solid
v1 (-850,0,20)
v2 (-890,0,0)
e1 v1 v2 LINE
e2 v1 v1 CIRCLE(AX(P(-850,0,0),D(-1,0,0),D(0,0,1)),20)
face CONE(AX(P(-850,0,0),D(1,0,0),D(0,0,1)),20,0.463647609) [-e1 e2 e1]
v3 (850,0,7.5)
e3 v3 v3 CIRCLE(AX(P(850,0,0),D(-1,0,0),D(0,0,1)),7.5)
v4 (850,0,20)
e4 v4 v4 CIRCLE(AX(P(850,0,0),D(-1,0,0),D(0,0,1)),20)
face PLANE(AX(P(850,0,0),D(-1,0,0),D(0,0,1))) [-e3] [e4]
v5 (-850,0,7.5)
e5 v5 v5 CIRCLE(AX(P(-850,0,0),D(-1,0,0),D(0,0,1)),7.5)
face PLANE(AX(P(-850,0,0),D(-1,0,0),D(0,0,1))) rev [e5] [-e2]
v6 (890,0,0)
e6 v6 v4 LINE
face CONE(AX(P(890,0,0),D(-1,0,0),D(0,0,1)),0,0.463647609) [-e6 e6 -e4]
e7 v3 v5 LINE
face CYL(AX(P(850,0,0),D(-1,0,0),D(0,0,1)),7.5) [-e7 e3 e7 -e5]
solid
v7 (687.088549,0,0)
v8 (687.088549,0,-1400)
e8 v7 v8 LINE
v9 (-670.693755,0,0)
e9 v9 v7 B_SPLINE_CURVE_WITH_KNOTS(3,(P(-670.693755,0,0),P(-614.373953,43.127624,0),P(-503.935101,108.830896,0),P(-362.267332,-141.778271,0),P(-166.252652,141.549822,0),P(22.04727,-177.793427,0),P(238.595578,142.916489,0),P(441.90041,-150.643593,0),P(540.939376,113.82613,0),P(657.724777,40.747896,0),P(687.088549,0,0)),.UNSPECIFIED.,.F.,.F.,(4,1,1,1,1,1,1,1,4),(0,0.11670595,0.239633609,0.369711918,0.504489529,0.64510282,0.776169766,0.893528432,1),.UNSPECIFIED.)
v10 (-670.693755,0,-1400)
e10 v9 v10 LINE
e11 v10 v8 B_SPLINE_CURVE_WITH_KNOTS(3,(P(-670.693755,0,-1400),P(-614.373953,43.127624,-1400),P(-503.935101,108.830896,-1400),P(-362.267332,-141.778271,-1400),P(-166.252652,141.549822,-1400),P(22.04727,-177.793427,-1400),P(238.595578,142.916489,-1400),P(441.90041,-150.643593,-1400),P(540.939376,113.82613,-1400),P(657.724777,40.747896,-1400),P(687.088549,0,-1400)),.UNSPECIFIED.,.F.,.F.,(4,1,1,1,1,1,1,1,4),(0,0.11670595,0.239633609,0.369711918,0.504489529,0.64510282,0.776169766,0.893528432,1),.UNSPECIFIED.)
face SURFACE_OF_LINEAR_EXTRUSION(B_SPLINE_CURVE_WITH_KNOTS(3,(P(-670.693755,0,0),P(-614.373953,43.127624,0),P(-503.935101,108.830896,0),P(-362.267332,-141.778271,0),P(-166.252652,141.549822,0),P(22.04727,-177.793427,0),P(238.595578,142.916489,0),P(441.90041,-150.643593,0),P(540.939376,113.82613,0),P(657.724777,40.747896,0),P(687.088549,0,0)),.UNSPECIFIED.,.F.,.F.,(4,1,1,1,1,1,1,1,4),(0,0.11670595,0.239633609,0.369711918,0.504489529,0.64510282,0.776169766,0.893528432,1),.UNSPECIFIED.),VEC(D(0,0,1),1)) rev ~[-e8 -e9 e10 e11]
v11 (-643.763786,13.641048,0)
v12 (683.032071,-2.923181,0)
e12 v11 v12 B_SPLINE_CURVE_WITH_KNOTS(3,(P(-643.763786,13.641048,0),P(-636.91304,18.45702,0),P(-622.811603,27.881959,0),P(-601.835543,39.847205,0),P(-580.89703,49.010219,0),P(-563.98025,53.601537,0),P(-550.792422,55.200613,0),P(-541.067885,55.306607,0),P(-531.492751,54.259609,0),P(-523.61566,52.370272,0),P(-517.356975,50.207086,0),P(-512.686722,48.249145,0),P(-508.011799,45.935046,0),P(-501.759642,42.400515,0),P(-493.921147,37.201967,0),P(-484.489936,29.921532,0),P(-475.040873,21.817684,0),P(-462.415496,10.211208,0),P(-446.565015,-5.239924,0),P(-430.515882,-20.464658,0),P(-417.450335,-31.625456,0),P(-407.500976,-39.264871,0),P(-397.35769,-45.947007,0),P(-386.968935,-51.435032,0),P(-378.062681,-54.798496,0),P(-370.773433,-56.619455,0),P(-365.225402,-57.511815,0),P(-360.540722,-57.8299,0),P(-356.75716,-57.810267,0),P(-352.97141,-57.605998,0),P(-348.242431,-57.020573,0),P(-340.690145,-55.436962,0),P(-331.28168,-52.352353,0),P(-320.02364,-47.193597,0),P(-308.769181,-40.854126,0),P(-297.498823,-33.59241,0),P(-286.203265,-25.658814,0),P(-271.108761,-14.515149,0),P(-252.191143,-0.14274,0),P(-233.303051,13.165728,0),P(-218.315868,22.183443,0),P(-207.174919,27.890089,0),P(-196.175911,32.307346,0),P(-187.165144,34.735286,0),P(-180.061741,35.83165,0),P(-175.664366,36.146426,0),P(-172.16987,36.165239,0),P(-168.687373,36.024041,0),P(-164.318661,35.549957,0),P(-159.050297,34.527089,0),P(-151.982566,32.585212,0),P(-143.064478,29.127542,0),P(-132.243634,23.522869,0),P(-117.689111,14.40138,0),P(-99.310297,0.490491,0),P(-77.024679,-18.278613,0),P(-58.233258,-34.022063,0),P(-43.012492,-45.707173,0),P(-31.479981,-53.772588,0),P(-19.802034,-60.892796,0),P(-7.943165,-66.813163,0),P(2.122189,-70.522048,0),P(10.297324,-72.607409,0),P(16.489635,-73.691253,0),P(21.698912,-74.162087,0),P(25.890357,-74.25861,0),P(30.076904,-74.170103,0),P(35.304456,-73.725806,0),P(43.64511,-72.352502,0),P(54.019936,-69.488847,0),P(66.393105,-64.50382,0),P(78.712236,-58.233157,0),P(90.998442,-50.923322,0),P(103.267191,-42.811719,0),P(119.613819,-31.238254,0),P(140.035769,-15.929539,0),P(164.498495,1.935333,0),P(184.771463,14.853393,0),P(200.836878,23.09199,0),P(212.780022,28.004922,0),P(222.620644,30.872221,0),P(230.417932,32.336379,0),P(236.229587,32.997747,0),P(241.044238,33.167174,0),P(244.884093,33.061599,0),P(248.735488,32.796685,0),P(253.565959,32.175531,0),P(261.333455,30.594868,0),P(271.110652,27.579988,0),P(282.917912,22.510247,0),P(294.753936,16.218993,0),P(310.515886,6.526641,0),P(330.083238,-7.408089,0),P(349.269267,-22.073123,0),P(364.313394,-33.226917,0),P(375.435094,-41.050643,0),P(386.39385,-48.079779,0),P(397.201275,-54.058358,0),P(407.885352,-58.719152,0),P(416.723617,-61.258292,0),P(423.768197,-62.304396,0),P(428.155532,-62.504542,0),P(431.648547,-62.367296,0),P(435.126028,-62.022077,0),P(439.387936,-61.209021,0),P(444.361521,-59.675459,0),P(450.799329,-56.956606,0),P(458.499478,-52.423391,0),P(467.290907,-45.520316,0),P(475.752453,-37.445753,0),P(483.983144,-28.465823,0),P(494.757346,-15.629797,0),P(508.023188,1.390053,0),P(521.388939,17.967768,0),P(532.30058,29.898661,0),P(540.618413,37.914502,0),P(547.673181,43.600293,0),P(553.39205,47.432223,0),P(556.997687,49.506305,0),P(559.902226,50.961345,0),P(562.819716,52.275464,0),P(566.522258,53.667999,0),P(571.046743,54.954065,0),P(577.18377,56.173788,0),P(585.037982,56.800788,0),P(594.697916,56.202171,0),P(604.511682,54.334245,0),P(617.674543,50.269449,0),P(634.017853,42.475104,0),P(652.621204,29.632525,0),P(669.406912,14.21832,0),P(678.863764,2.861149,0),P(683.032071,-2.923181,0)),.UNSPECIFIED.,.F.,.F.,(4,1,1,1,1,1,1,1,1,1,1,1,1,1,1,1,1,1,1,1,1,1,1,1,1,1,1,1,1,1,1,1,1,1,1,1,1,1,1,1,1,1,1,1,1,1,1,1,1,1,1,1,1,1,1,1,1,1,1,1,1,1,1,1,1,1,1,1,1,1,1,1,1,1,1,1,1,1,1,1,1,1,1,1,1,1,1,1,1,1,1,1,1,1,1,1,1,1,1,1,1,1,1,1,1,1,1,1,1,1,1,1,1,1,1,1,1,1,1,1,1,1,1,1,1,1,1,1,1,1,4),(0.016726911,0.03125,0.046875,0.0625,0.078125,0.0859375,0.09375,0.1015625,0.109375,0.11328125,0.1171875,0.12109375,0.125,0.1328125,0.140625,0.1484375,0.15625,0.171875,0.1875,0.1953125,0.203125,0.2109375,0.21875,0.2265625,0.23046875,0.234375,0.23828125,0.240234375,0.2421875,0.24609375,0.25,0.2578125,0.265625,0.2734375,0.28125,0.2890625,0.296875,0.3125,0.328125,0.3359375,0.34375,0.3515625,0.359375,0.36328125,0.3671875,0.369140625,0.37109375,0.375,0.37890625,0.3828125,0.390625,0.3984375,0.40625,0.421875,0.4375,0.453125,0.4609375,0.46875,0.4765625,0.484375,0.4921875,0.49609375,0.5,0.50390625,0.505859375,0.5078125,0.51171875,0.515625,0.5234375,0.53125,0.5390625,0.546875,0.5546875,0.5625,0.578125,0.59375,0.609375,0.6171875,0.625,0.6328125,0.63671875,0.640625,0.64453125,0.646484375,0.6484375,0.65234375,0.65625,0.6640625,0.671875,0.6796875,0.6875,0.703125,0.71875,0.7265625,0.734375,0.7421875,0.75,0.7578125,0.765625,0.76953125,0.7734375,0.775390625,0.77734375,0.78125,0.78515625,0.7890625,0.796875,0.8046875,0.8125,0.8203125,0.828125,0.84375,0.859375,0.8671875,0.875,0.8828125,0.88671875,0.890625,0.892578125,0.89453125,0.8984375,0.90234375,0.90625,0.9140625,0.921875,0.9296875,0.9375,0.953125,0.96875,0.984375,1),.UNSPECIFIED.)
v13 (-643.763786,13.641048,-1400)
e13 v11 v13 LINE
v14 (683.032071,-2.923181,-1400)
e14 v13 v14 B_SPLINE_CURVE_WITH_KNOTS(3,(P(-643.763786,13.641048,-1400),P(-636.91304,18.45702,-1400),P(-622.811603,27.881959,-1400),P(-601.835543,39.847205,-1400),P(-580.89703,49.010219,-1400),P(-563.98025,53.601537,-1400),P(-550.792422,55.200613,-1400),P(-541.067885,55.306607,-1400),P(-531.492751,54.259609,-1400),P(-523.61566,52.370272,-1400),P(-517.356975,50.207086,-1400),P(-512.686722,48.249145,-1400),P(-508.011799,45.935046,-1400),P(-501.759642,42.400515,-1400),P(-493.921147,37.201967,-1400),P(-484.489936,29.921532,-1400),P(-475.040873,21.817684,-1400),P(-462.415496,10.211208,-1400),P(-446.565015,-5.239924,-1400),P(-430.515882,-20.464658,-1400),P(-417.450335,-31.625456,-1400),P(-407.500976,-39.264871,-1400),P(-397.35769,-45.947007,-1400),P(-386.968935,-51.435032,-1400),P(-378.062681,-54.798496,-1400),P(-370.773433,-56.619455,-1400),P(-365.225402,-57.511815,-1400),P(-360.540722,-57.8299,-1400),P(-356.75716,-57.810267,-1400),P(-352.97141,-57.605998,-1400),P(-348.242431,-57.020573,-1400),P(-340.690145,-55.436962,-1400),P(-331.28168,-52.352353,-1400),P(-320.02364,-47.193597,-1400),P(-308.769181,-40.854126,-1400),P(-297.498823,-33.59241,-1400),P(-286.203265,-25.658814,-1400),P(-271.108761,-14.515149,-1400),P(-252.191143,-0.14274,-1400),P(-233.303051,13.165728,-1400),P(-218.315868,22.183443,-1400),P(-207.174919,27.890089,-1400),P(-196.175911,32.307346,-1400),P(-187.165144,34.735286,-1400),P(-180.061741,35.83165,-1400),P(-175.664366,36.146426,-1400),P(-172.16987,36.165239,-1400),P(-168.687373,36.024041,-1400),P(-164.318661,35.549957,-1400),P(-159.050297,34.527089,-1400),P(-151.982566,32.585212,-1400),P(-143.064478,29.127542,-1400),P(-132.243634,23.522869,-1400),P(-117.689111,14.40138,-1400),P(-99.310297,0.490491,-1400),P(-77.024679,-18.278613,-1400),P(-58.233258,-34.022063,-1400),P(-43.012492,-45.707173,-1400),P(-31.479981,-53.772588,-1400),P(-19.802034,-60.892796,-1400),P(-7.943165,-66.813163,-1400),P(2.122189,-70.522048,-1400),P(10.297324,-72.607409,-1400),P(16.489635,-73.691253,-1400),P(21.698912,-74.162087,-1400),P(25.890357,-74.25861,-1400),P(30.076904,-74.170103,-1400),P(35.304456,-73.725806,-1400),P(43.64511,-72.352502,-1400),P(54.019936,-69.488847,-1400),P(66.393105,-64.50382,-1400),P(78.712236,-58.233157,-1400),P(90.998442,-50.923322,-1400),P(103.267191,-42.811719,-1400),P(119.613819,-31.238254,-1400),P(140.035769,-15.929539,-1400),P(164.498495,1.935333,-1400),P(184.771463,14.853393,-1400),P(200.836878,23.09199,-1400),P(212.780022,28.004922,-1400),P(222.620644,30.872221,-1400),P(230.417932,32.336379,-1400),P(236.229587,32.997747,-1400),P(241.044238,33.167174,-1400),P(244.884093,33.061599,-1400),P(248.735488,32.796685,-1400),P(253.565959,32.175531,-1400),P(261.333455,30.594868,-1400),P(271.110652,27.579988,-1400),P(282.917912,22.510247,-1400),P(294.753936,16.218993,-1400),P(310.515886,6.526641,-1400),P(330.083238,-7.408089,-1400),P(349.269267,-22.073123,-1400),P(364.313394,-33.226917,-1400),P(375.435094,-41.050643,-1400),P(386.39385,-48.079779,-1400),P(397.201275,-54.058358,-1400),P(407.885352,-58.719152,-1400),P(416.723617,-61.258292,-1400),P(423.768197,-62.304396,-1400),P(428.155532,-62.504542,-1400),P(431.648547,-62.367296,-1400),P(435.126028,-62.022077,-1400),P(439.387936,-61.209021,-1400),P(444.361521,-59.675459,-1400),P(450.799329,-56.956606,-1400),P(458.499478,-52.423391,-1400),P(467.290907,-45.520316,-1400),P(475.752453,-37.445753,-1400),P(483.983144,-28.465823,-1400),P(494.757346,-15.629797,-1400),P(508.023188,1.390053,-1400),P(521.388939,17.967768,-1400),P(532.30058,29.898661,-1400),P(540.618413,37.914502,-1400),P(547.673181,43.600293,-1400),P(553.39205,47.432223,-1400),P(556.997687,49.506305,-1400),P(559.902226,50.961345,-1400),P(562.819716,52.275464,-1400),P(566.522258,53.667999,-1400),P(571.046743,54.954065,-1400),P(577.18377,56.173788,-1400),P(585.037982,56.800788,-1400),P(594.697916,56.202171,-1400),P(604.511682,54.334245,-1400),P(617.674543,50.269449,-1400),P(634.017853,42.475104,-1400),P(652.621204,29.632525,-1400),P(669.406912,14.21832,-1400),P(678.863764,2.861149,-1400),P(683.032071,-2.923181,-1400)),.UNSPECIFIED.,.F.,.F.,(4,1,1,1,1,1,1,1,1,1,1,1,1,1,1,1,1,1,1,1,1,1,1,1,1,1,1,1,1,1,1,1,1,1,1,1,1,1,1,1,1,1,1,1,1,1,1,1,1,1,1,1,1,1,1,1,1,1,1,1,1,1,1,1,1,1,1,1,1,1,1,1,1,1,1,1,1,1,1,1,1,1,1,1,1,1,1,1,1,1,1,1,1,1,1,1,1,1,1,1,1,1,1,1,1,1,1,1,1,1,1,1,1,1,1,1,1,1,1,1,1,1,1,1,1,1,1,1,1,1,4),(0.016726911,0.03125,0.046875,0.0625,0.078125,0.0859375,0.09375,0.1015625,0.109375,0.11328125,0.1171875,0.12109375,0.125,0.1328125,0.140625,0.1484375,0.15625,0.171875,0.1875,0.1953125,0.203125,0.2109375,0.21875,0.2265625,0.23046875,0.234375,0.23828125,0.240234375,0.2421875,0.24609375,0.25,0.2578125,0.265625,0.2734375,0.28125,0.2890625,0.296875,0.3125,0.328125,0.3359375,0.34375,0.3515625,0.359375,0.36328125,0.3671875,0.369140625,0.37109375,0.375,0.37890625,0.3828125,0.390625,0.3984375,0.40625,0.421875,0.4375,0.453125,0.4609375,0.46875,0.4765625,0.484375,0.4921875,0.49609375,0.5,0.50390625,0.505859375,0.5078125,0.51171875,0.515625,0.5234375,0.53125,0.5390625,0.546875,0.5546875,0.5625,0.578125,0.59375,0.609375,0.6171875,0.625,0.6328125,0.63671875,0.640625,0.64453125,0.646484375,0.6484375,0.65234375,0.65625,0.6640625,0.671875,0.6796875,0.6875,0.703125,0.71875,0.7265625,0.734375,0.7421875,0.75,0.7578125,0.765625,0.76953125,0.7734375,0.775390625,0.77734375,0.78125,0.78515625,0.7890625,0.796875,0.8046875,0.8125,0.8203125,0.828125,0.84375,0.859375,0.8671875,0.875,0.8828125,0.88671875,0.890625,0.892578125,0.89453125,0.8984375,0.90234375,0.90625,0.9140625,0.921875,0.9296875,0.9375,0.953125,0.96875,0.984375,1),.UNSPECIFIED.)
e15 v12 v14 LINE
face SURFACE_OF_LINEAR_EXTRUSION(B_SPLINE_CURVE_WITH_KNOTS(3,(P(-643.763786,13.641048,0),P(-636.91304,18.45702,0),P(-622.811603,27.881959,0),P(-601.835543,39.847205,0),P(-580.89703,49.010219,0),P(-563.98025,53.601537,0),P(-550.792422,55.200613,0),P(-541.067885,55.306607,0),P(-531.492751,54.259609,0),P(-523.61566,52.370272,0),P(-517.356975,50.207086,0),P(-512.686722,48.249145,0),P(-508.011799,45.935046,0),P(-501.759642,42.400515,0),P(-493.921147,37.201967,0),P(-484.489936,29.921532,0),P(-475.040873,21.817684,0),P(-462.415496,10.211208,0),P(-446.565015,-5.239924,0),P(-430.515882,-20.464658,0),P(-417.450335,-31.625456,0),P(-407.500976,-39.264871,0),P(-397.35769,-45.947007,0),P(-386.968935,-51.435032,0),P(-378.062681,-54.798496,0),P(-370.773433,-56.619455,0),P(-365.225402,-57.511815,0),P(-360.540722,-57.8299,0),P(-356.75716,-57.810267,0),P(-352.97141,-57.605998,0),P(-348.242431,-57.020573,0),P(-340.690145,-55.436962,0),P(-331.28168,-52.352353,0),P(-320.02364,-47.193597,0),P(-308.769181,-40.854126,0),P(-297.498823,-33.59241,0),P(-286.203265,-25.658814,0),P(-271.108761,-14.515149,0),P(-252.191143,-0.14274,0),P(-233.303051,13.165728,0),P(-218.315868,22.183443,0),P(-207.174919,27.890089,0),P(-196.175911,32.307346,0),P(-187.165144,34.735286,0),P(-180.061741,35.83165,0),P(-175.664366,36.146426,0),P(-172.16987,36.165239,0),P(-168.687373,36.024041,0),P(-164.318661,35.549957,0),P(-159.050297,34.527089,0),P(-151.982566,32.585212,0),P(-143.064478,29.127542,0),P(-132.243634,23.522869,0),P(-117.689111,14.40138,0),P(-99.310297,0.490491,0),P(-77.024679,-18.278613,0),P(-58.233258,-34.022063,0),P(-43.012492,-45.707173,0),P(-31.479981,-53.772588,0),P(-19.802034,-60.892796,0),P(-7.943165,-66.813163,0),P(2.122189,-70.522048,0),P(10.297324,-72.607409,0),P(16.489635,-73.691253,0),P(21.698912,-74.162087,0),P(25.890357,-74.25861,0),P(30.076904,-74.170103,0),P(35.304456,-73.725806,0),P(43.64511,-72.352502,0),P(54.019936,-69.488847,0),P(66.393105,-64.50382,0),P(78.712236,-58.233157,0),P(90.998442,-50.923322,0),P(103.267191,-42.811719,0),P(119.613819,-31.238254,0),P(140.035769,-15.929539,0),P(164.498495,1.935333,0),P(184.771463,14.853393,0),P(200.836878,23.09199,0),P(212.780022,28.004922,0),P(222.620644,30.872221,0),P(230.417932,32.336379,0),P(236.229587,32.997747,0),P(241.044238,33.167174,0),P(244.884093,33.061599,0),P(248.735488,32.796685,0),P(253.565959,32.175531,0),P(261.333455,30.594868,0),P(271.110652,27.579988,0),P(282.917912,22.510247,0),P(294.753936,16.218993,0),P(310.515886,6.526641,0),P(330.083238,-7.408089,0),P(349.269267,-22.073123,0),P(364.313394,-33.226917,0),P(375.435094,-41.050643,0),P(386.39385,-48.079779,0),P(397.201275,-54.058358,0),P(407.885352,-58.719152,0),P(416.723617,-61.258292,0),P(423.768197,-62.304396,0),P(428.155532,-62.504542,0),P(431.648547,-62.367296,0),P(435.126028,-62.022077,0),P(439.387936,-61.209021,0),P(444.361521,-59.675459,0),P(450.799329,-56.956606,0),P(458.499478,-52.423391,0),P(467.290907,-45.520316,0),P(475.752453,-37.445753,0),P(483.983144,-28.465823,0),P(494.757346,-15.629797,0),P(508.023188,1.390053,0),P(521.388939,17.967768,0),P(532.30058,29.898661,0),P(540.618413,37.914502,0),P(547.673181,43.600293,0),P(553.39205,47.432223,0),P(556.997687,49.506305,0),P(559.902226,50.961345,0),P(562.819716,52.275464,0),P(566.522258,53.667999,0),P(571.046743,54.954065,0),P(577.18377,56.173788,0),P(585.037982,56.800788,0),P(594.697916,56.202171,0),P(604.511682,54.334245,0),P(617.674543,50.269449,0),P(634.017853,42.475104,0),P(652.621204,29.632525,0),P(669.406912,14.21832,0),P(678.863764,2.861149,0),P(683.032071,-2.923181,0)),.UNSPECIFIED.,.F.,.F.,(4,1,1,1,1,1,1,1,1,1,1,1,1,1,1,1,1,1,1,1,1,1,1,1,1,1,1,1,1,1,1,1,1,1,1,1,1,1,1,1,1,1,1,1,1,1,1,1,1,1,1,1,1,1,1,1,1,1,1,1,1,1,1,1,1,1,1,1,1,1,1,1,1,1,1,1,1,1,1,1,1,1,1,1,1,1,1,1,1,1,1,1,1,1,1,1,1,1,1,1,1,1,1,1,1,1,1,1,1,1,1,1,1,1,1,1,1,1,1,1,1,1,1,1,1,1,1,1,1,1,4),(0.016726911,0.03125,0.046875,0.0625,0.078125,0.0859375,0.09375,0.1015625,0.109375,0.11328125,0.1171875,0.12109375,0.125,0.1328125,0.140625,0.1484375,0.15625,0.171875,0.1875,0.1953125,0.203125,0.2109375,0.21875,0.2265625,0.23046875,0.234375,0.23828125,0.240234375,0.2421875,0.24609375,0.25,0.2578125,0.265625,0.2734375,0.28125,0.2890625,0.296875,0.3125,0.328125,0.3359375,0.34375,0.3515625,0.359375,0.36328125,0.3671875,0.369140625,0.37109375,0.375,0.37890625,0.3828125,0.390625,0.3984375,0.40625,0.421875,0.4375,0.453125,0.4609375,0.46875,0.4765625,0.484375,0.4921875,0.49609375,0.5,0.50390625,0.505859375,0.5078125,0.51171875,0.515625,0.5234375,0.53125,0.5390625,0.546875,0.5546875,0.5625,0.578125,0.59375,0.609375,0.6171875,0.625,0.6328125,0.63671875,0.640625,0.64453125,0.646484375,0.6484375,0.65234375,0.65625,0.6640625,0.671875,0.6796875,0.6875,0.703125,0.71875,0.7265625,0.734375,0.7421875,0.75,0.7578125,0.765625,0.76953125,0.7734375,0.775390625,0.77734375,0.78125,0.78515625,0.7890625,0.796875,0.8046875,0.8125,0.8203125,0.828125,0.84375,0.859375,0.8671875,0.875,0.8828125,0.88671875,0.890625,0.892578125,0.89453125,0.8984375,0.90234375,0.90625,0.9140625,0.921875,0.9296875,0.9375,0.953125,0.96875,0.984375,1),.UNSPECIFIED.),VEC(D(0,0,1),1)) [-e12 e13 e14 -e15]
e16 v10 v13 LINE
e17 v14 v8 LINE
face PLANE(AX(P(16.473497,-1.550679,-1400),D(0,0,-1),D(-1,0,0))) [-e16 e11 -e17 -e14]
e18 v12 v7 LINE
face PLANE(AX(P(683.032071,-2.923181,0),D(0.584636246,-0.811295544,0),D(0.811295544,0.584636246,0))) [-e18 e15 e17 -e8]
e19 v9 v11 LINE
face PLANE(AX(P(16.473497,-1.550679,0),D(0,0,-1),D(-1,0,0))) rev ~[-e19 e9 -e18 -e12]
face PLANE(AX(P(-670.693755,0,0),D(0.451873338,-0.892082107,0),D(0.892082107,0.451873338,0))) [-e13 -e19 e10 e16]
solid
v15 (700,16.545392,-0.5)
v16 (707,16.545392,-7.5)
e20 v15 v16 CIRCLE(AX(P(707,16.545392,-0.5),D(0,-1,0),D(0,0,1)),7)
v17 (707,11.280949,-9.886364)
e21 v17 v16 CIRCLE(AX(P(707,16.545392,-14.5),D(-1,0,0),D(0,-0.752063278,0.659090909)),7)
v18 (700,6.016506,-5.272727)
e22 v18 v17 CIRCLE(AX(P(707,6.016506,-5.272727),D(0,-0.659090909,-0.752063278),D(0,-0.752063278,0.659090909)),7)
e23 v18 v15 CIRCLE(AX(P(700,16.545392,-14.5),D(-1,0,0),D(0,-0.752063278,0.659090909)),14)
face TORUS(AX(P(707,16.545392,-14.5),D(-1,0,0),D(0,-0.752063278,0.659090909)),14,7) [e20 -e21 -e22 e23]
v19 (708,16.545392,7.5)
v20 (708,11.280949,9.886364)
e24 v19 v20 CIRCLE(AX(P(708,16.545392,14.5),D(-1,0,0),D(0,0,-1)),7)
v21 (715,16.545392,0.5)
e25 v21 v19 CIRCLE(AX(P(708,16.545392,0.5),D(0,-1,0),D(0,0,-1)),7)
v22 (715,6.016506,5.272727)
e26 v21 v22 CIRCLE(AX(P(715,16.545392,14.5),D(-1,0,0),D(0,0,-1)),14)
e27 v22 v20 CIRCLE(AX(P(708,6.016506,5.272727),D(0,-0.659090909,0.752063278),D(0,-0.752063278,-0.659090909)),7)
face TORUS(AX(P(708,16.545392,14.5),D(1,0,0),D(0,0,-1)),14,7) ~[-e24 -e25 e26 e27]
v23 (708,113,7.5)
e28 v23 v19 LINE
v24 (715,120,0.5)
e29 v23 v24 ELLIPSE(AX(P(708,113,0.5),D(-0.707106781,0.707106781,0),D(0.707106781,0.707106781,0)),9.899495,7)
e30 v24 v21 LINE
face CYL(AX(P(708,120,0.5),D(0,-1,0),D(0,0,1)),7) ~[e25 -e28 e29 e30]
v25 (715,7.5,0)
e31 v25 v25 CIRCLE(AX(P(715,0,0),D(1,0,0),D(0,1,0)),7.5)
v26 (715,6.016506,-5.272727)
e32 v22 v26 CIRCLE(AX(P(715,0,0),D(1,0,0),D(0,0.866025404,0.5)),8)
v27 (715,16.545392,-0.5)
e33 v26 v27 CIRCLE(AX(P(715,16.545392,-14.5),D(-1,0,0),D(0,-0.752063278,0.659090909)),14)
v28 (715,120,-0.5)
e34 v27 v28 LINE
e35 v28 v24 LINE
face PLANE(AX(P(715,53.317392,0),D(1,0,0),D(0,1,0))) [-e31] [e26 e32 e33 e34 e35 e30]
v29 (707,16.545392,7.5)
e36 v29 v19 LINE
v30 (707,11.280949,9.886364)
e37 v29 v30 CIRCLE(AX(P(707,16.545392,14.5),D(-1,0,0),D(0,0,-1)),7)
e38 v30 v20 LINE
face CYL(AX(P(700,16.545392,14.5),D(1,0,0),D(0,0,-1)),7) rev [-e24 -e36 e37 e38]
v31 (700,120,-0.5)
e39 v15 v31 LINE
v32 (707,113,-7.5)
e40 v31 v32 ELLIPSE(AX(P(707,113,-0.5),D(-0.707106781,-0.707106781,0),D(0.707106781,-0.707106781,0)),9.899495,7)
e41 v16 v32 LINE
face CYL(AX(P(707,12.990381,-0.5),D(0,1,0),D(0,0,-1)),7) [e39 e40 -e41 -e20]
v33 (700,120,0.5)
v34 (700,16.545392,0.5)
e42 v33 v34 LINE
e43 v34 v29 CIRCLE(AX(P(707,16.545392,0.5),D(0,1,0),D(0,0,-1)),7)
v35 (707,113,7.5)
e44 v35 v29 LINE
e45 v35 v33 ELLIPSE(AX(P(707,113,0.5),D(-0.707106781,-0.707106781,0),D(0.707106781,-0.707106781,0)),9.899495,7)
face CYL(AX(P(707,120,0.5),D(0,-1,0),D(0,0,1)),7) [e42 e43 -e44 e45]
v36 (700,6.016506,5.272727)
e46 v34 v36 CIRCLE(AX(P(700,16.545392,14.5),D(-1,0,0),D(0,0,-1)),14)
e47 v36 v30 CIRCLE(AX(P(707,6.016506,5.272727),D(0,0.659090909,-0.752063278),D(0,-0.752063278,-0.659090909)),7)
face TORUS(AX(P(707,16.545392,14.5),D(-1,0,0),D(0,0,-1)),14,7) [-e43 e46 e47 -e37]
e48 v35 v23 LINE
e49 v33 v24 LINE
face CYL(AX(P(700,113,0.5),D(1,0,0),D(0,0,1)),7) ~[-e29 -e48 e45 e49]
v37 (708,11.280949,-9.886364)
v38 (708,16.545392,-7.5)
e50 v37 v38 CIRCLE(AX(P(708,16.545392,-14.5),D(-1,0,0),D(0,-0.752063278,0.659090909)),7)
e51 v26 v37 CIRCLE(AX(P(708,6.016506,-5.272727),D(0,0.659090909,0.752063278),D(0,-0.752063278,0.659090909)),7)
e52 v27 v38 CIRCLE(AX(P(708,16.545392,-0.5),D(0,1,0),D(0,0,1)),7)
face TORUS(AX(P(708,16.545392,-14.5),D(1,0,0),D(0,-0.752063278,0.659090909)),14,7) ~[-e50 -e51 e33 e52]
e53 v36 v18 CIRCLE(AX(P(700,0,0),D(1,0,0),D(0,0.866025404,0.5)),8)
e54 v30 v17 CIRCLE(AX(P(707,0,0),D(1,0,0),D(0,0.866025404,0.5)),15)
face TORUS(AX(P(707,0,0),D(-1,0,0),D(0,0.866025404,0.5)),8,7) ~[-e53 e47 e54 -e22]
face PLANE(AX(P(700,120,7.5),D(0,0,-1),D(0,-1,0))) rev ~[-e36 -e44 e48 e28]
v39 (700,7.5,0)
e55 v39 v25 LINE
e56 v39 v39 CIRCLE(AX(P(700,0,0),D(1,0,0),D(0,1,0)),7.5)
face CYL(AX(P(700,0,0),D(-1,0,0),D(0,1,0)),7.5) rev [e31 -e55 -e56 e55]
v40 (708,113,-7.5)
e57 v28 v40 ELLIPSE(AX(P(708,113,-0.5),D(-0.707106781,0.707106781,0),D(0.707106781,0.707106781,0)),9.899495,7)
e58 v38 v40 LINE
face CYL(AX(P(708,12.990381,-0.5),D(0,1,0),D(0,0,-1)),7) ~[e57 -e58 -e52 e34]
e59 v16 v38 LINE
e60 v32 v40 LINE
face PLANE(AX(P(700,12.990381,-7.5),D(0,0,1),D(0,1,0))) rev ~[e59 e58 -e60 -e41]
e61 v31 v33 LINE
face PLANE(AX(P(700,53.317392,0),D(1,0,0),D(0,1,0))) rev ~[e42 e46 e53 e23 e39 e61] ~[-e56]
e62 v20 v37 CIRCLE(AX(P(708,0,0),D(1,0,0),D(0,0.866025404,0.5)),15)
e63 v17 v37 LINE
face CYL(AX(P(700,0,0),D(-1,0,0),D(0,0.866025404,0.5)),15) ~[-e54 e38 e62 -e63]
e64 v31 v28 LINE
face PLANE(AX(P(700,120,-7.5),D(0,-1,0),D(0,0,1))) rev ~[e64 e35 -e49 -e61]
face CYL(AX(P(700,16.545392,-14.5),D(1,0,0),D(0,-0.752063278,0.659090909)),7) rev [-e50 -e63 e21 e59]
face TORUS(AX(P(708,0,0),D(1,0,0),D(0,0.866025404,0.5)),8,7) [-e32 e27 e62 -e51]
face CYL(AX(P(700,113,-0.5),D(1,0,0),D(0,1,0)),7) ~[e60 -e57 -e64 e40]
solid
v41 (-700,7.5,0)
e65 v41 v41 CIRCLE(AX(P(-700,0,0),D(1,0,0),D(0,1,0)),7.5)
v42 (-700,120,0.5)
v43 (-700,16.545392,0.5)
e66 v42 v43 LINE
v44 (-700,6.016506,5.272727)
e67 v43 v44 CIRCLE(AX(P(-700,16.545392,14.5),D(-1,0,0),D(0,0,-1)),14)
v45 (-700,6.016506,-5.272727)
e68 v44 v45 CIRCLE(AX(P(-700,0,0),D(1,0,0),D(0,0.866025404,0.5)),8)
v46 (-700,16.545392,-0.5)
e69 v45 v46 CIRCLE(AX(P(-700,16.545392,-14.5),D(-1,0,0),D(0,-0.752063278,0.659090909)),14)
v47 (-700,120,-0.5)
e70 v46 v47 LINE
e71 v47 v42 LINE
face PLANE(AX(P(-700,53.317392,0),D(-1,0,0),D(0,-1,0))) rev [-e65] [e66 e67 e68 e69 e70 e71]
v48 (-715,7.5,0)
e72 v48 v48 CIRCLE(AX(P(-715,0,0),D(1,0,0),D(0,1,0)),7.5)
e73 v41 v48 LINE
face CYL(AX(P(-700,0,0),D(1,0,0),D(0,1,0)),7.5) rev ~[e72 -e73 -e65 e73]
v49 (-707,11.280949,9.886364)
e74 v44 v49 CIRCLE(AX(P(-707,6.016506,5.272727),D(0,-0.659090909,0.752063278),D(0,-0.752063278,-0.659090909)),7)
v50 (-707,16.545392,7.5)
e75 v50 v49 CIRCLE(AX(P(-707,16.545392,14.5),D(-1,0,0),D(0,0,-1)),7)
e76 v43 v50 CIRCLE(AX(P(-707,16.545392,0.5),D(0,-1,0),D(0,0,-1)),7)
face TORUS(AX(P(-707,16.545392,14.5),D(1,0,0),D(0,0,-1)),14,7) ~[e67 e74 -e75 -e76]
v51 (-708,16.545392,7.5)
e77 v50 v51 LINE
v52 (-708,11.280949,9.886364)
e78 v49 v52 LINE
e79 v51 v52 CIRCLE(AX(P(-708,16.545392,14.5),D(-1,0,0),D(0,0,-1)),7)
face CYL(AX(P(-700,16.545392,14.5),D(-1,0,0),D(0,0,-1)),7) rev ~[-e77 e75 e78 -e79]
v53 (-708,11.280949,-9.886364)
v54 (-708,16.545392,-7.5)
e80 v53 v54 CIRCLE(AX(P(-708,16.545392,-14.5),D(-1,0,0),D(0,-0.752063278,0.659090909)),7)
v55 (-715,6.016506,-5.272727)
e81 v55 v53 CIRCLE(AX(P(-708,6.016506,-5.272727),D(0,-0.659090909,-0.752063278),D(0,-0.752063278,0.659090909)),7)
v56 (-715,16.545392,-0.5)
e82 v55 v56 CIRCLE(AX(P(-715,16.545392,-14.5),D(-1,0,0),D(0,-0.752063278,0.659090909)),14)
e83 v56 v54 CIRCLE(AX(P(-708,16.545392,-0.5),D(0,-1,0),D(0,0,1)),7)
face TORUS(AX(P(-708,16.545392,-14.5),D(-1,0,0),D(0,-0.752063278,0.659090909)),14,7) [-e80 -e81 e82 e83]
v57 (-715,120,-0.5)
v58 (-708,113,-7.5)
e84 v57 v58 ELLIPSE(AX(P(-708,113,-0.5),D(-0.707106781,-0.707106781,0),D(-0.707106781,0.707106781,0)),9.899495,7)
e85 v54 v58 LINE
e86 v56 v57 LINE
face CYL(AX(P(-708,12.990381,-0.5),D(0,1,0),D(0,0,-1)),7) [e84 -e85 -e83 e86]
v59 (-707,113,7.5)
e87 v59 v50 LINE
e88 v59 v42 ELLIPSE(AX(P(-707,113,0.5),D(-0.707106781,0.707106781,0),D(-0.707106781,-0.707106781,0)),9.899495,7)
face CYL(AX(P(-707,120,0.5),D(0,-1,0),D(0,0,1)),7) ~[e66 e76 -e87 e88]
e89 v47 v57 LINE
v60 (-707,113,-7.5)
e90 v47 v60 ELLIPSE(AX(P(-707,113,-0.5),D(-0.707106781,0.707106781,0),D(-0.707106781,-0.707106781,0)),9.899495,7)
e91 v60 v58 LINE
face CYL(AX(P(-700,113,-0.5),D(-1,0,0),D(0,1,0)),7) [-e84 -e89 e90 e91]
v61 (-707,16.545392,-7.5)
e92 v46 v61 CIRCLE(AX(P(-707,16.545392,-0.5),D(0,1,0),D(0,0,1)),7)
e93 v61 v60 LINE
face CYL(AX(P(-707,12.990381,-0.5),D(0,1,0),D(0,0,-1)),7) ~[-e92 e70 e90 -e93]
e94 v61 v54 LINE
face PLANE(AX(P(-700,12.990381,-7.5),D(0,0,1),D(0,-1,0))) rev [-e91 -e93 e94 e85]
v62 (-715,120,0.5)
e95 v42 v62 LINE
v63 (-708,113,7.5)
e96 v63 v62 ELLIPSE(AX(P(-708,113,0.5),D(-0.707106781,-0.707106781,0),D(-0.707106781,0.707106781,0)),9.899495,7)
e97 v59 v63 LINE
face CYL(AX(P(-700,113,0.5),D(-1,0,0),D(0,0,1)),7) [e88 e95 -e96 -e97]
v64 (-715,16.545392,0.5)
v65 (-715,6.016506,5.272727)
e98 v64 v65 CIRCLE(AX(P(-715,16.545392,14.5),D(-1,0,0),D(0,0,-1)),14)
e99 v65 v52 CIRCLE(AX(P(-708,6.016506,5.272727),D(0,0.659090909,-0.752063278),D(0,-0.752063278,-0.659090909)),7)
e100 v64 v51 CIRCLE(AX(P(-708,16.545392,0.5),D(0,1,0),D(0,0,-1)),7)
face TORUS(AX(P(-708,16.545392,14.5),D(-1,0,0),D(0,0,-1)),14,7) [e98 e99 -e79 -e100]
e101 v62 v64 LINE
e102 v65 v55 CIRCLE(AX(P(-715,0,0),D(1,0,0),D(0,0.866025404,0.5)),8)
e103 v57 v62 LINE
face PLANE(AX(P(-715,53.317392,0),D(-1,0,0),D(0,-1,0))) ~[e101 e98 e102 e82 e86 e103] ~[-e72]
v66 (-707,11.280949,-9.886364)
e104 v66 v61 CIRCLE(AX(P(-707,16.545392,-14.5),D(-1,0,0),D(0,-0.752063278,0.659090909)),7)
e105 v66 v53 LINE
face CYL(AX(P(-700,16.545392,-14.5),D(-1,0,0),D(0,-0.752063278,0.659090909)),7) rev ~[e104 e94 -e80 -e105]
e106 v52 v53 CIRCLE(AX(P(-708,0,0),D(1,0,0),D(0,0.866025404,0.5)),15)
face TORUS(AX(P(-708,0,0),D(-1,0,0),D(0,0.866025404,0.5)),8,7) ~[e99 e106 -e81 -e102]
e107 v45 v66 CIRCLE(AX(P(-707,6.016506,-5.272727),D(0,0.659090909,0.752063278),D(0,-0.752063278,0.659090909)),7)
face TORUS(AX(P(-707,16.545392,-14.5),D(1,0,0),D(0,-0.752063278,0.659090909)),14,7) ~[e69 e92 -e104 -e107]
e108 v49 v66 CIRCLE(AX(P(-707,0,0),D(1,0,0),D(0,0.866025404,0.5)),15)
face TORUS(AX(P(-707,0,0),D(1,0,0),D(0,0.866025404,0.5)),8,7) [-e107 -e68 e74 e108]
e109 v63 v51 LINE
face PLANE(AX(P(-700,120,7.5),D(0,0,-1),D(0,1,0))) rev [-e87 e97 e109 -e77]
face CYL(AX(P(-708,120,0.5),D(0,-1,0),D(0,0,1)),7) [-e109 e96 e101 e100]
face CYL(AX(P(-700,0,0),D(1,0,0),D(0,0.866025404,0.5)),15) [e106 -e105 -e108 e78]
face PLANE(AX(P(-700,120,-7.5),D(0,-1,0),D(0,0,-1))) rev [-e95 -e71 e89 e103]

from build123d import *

# Parameters (mm, degrees)
F3_R     = 7.5
F4_DEPTH = 15
F5_R     = 7
F8_DEPTH = 1400


# Not quite as in the source:
# - ends of sketch curves that miss each other by under 0.0002 mm in the source are joined
# - the dataset's text gives a spline's control points without its knots; the knots are read off the source's solid


with BuildPart() as f1:
    # F0 (on Front) → F1 (revolve)
    with BuildSketch(Plane.XZ):
        Polygon((-850, 20), (-890, 0), (890, 0), (850, 20), (850, 7.5), (-850, 7.5), align=None)
    revolve(axis=Axis((0, 0, 0), (-1, 0, 0)))


with BuildPart() as f4:
    # F3 (on offset) → F4 (new body)
    with BuildSketch(Plane.YZ.offset(700)):
        with BuildLine():
            Line((120, 7.5), (12.9903810568, 7.5))
            ThreePointArc((12.9903810568, 7.5), (-15, 0), (12.9903810568, -7.5))
            Line((12.9903810568, -7.5), (120, -7.5))
            Line((120, -7.5), (120, 7.5))
        make_face()
        Circle(F3_R, mode=Mode.SUBTRACT)
    extrude(amount=F4_DEPTH)

    # F5
    f5_edges = [f4.edges().sort_by_distance(p)[0] for p in [
        (707.5, 120, 7.5),
        (707.5, 12.990381, 7.5),
        (700, 66.495191, 7.5),
        (715, 66.495191, 7.5),
        (707.5, 12.990381, -7.5),
        (700, -15, 0),
        (715, -15, 0),
        (707.5, 120, -7.5),
        (700, 66.495191, -7.5),
        (715, 66.495191, -7.5),
    ]]
    fillet(f5_edges, radius=F5_R)


with BuildPart() as f6_1:
    # F6: instance of F4
    add(f4.part.mirror(Plane.YZ))


with BuildPart() as f8:
    # F7 (on Top) → F8 (new body)
    with BuildSketch(Plane.XY):
        with BuildLine():
            add(Edge.make_bspline(
                [(-670.6937551498, 0), (-614.3739529849, 43.1276240513), (-503.935100688, 108.8308960068), (-362.2673319574, -141.7782707313), (-166.2526515003, 141.5498224049), (22.0472697916, -177.7934265192), (238.5955784254, 142.9164890413), (441.9004095898, -150.6435928961), (540.9393764759, 113.8261303534), (657.7247773689, 40.7478963714), (687.0885491371, 0)],
                knots=[0, 0, 0, 0, 0.1167059495, 0.2396336092, 0.3697119181, 0.504489529, 0.6451028195, 0.7761697664, 0.8935284317, 1, 1, 1, 1], degree=3))
            Line((-670.6937551498, 0), (-643.763785974, 13.6410482552))
            add(Edge.make_bspline(
                [(-643.763785974, 13.6410482552), (-636.913039698, 18.4570202201), (-622.8116029597, 27.8819588686), (-601.835543085, 39.8472046621), (-580.8970297945, 49.0102192481), (-563.9802501877, 53.6015366481), (-550.7924221753, 55.2006128136), (-541.0678849864, 55.3066074937), (-531.4927513032, 54.259609341), (-523.6156599952, 52.3702724168), (-517.3569747691, 50.2070864292), (-512.6867218869, 48.2491445642), (-508.0117992724, 45.9350459268), (-501.7596420883, 42.4005152749), (-493.9211466123, 37.2019668625), (-484.4899357328, 29.9215322439), (-475.0408732434, 21.8176835289), (-462.4154959996, 10.2112084592), (-446.5650151802, -5.239923565), (-430.5158822065, -20.4646579487), (-417.4503350768, -31.6254561731), (-407.5009759804, -39.264870881), (-397.3576903794, -45.9470072709), (-386.9689347873, -51.4350318847), (-378.0626806236, -54.7984958048), (-370.7734333609, -56.6194547196), (-365.2254024954, -57.5118147501), (-360.5407224445, -57.8299001173), (-356.7571596564, -57.8102668966), (-352.9714098517, -57.6059984282), (-348.2424308865, -57.0205733142), (-340.6901447793, -55.4369622065), (-331.2816799091, -52.352352747), (-320.0236402265, -47.1935972314), (-308.7691812475, -40.8541260767), (-297.4988233468, -33.5924104819), (-286.2032650196, -25.6588137615), (-271.1087613436, -14.5151486282), (-252.191143483, -0.142740191), (-233.3030507696, 13.1657275771), (-218.3158678651, 22.1834426885), (-207.1749186377, 27.8900885994), (-196.175911243, 32.3073460769), (-187.1651444335, 34.7352860958), (-180.0617413253, 35.8316499626), (-175.6643659457, 36.1464262602), (-172.1698702327, 36.1652394346), (-168.6873732305, 36.0240411136), (-164.3186611921, 35.549956619), (-159.0502972196, 34.5270893651), (-151.9825660211, 32.5852115468), (-143.0644779709, 29.1275415894), (-132.2436342222, 23.5228691932), (-117.6891114969, 14.401380201), (-99.3102972555, 0.4904906162), (-77.0246789272, -18.2786131316), (-58.2332577732, -34.0220632618), (-43.012491741, -45.7071731766), (-31.4799807719, -53.7725884064), (-19.8020341734, -60.8927964534), (-7.9431652974, -66.8131627408), (2.1221885969, -70.5220483502), (10.2973244286, -72.6074092029), (16.4896351805, -73.6912527844), (21.6989124907, -74.1620866053), (25.890357465, -74.2586097388), (30.0769044192, -74.1701029531), (35.304455582, -73.7258056175), (43.6451097686, -72.3525018059), (54.0199363775, -69.4888468875), (66.3931050228, -64.5038198354), (78.7122357244, -58.2331567927), (90.9984421726, -50.9233215282), (103.2671912498, -42.8117191421), (119.6138193679, -31.2382536138), (140.0357688863, -15.9295393415), (164.4984950231, 1.935332908), (184.7714630248, 14.8533931425), (200.8368775522, 23.0919904282), (212.780022253, 28.0049222573), (222.6206443148, 30.8722205887), (230.4179320306, 32.336378693), (236.2295867624, 32.9977474251), (241.0442382147, 33.1671740352), (244.8840932803, 33.0615991942), (248.7354882724, 32.7966852748), (253.5659590208, 32.1755307596), (261.3334546625, 30.5948681413), (271.1106516001, 27.5799881614), (282.9179121968, 22.5102470797), (294.7539358949, 16.2189931957), (310.5158856967, 6.5266408618), (330.0832382885, -7.4080889802), (349.2692670927, -22.0731226427), (364.3133942811, -33.226916937), (375.435094448, -41.0506433385), (386.3938503105, -48.0797792734), (397.2012748421, -54.058358024), (407.8853517187, -58.7191517001), (416.7236170186, -61.2582920899), (423.7681966191, -62.3043958063), (428.155532052, -62.5045421958), (431.6485467186, -62.3672958008), (435.1260281475, -62.0220765234), (439.3879361412, -61.2090209039), (444.3615208454, -59.6754592837), (450.7993285941, -56.9566056159), (458.4994777713, -52.4233909767), (467.2909074427, -45.5203161881), (475.7524534834, -37.4457534801), (483.983143576, -28.4658227454), (494.757346215, -15.6297969749), (508.0231877001, 1.3900534297), (521.3889393854, 17.9677676889), (532.300580103, 29.8986613037), (540.6184128273, 37.9145016088), (547.6731812707, 43.6002928254), (553.3920497432, 47.4322226329), (556.9976870507, 49.5063049507), (559.9022257026, 50.9613448303), (562.8197155458, 52.2754644668), (566.5222584039, 53.6679987047), (571.0467434202, 54.9540652287), (577.1837700139, 56.1737878851), (585.0379816061, 56.8007883765), (594.6979161308, 56.2021711556), (604.5116823025, 54.3342447701), (617.6745431072, 50.269448945), (634.0178531075, 42.4751040133), (652.6212039978, 29.6325248002), (669.4069118431, 14.2183195432), (678.8637644961, 2.8611485143), (683.0320714182, -2.9231812321)],
                knots=[0.0167269107, 0.0167269107, 0.0167269107, 0.0167269107, 0.03125, 0.046875, 0.0625, 0.078125, 0.0859375, 0.09375, 0.1015625, 0.109375, 0.11328125, 0.1171875, 0.12109375, 0.125, 0.1328125, 0.140625, 0.1484375, 0.15625, 0.171875, 0.1875, 0.1953125, 0.203125, 0.2109375, 0.21875, 0.2265625, 0.23046875, 0.234375, 0.23828125, 0.240234375, 0.2421875, 0.24609375, 0.25, 0.2578125, 0.265625, 0.2734375, 0.28125, 0.2890625, 0.296875, 0.3125, 0.328125, 0.3359375, 0.34375, 0.3515625, 0.359375, 0.36328125, 0.3671875, 0.369140625, 0.37109375, 0.375, 0.37890625, 0.3828125, 0.390625, 0.3984375, 0.40625, 0.421875, 0.4375, 0.453125, 0.4609375, 0.46875, 0.4765625, 0.484375, 0.4921875, 0.49609375, 0.5, 0.50390625, 0.505859375, 0.5078125, 0.51171875, 0.515625, 0.5234375, 0.53125, 0.5390625, 0.546875, 0.5546875, 0.5625, 0.578125, 0.59375, 0.609375, 0.6171875, 0.625, 0.6328125, 0.63671875, 0.640625, 0.64453125, 0.646484375, 0.6484375, 0.65234375, 0.65625, 0.6640625, 0.671875, 0.6796875, 0.6875, 0.703125, 0.71875, 0.7265625, 0.734375, 0.7421875, 0.75, 0.7578125, 0.765625, 0.76953125, 0.7734375, 0.775390625, 0.77734375, 0.78125, 0.78515625, 0.7890625, 0.796875, 0.8046875, 0.8125, 0.8203125, 0.828125, 0.84375, 0.859375, 0.8671875, 0.875, 0.8828125, 0.88671875, 0.890625, 0.892578125, 0.89453125, 0.8984375, 0.90234375, 0.90625, 0.9140625, 0.921875, 0.9296875, 0.9375, 0.953125, 0.96875, 0.984375, 1, 1, 1, 1], degree=3))
            Line((683.0320714182, -2.9231812321), (687.0885491371, 0))
        make_face()
    extrude(amount=-F8_DEPTH)


solid = Compound([f1.part, f4.part, f6_1.part, f8.part])
